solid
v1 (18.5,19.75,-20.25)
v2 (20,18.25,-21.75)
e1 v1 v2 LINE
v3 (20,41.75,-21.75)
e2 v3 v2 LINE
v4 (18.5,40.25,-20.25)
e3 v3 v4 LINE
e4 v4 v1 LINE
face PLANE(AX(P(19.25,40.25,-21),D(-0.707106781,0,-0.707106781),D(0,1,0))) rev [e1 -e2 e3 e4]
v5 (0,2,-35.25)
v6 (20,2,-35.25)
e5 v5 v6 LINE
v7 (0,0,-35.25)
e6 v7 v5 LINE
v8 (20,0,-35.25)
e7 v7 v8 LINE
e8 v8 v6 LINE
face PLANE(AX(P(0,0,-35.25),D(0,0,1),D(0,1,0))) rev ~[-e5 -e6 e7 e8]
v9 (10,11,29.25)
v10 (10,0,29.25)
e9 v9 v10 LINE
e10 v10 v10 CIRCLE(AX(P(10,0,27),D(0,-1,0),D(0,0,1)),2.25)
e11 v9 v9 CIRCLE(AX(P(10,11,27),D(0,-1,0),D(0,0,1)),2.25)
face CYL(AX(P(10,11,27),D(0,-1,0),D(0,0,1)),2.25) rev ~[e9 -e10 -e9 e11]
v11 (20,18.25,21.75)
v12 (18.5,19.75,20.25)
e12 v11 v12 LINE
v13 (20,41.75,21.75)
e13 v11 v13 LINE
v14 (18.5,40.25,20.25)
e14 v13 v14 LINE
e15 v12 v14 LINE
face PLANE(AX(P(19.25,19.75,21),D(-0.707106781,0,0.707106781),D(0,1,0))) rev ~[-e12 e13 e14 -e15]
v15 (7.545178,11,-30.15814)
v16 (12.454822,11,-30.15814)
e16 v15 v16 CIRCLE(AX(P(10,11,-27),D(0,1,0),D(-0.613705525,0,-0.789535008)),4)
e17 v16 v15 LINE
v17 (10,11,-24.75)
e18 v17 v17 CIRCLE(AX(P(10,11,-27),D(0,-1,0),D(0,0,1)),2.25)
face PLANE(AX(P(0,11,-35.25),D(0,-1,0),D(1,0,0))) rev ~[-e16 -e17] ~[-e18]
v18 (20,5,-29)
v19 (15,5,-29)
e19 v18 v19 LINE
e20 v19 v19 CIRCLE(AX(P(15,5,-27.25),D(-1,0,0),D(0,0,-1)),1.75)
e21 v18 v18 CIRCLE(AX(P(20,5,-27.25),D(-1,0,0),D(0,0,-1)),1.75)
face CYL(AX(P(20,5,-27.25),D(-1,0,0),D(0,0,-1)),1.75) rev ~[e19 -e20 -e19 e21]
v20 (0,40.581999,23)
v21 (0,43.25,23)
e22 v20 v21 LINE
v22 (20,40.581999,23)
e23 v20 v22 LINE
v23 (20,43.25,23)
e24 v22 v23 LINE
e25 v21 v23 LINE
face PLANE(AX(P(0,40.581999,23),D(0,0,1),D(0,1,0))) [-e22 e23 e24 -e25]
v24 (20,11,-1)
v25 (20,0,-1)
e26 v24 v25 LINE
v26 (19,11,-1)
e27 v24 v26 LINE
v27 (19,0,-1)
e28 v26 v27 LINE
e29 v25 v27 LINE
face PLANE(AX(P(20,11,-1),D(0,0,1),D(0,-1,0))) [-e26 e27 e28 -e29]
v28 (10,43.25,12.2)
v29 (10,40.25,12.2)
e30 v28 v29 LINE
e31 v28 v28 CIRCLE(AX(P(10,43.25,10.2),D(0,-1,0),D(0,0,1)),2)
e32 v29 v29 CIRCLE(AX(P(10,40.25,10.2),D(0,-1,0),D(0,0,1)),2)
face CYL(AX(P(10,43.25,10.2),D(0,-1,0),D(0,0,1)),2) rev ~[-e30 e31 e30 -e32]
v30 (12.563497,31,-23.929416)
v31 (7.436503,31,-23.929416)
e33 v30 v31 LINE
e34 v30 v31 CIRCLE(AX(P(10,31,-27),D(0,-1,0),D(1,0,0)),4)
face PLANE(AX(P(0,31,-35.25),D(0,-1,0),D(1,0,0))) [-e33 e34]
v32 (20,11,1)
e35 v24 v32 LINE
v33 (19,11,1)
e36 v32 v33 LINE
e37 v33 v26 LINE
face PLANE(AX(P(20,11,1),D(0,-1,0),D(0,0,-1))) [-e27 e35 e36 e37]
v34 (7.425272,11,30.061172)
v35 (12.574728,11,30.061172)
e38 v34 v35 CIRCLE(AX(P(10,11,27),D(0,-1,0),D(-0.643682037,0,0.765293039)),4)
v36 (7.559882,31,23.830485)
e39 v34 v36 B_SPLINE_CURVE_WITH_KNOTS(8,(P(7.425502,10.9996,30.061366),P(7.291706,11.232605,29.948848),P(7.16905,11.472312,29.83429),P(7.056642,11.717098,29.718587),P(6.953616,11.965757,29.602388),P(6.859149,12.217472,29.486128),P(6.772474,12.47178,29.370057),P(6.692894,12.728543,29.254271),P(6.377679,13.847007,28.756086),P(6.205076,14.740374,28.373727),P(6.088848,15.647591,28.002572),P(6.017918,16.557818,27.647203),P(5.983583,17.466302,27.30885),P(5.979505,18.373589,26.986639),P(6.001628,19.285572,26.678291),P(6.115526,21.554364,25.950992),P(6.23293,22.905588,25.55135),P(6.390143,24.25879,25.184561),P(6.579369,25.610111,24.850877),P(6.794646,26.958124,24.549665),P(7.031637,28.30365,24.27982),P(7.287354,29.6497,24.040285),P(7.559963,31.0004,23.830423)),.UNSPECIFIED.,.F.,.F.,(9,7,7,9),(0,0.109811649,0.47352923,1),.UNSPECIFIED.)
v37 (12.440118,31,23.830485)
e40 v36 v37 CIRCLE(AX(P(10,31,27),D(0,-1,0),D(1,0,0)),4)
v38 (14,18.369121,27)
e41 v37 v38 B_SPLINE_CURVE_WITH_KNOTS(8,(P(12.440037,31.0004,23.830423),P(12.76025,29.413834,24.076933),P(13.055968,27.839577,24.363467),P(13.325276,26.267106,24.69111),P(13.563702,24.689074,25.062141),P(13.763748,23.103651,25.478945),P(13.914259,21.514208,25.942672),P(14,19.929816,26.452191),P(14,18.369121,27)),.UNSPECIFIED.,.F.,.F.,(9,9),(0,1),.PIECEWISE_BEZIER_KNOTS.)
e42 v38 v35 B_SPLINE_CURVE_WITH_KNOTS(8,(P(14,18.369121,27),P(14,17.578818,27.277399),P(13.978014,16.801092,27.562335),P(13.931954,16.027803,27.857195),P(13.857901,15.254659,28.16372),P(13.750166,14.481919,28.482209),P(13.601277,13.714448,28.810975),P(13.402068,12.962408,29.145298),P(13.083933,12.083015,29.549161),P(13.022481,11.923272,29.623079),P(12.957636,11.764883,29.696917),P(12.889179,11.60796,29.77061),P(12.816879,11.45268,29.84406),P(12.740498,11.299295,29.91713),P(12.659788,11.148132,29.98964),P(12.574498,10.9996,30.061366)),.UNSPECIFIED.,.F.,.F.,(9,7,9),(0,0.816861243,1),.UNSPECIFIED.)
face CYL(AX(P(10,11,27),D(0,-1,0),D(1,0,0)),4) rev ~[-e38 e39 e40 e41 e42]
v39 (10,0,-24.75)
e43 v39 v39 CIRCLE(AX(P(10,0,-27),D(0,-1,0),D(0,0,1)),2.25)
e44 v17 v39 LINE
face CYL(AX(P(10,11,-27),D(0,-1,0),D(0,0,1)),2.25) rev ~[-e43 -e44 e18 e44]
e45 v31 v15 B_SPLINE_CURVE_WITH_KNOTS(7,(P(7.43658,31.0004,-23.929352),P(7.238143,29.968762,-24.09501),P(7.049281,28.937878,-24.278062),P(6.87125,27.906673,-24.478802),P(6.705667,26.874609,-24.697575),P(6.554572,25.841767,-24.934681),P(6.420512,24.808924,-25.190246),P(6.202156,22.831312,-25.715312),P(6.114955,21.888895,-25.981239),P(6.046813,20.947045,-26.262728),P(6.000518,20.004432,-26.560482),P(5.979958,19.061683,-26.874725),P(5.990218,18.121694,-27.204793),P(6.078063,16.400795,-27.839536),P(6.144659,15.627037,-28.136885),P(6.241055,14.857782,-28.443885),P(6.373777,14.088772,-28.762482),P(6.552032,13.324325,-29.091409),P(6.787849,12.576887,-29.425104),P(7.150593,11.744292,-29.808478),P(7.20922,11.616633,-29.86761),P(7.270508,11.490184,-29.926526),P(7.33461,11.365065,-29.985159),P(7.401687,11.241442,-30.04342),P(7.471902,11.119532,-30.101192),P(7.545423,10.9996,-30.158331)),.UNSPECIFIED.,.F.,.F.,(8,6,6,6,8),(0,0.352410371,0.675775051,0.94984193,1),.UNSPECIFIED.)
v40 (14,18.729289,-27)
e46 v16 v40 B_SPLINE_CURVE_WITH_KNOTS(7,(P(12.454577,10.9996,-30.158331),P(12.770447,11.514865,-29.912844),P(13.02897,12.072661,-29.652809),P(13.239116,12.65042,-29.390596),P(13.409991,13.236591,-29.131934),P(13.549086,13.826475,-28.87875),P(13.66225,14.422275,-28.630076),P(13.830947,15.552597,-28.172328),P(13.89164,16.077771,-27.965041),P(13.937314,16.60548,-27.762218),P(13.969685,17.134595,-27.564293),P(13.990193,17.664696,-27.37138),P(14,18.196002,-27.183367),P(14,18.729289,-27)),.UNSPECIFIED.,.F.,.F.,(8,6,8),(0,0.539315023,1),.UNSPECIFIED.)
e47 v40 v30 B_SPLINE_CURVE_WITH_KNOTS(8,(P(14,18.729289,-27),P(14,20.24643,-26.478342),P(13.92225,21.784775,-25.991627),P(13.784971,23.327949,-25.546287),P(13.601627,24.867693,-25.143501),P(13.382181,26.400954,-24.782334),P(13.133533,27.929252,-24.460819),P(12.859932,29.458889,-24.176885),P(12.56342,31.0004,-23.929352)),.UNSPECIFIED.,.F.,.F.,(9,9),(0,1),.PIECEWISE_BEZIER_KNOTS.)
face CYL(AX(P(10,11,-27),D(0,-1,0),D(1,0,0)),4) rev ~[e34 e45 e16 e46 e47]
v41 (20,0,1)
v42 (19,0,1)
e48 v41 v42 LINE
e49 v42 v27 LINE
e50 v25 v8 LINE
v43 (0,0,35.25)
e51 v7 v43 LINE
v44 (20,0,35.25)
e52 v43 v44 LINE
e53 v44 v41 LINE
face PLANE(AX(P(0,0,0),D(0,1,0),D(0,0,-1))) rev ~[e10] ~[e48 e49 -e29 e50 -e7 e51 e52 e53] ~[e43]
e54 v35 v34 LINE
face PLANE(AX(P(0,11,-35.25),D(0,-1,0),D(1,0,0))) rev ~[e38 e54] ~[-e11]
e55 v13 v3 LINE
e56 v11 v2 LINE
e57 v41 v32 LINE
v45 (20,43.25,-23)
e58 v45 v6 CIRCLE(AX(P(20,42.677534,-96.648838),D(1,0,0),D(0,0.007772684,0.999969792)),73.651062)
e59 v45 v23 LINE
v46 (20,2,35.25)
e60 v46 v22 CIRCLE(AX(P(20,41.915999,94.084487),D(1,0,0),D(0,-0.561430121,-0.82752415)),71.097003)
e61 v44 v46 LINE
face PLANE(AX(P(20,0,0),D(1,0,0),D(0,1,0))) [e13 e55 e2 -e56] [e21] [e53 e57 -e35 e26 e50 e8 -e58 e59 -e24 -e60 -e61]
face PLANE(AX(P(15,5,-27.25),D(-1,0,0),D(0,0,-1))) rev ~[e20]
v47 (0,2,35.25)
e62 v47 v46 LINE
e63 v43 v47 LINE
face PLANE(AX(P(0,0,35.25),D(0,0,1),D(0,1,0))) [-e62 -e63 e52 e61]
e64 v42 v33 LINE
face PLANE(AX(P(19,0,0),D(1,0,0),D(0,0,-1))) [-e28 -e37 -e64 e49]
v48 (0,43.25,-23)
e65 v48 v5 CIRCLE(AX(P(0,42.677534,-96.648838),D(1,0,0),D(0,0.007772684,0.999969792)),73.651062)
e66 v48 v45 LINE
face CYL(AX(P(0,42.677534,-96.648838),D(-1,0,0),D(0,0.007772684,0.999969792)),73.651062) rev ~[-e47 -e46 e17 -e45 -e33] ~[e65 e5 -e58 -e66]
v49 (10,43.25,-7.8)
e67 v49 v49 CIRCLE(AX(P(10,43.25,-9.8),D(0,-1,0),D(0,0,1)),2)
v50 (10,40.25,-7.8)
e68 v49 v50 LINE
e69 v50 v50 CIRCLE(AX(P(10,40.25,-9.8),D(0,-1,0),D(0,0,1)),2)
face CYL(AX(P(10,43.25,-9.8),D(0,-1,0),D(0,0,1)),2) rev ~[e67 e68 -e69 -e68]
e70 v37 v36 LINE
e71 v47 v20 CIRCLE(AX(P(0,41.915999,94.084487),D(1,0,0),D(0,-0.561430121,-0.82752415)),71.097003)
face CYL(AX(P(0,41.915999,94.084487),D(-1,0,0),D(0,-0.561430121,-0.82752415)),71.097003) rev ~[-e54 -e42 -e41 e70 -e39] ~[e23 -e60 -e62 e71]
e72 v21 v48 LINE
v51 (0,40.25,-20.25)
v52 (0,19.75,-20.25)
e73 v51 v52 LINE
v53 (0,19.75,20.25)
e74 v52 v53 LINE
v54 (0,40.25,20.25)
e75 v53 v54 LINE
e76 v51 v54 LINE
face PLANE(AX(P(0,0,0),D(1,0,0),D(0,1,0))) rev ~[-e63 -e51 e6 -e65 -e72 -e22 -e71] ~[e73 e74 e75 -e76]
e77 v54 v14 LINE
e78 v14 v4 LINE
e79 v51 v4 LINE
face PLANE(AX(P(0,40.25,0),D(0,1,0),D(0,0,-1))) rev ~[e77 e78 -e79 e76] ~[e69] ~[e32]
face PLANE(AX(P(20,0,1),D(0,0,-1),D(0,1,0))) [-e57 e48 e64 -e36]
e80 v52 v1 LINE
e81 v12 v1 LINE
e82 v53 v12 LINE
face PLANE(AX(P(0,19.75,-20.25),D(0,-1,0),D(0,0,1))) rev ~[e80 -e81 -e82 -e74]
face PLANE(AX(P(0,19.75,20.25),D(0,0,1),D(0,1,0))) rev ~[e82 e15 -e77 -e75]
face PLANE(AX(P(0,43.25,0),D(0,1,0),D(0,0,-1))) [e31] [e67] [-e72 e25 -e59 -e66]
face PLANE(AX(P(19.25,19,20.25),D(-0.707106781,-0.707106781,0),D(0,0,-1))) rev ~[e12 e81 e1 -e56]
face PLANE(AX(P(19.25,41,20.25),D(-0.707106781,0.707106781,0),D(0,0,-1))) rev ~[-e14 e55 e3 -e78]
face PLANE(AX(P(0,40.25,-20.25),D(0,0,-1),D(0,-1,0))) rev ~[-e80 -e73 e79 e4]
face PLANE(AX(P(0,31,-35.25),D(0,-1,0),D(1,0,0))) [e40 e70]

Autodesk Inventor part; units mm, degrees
ref_plane "YZ Plane" through (0, 0, 0) normal (1, 0, 0) x (0, 1, 0)
ref_plane "XZ Plane" through (0, 0, 0) normal (0, 1, 0) x (-1, 0, 0)
ref_plane "XY Plane" through (0, 0, 0) normal (0, 0, 1) x (1, 0, 0)
sketch "Sketch1" plane through (0, 0, 0) normal (1, 0, 0) x (0, 1, 0)
  line L0 (0, 0) -> (0, -35.25)
  line L1 (0, -35.25) -> (2, -35.25)
  line L2 (19.75, 20.25) -> (40.25, 20.25)
  line L3 (40.25, 20.25) -> (40.25, -20.25)
  line L4 (40.25, -20.25) -> (19.75, -20.25)
  line L5 (19.75, -20.25) -> (19.75, 20.25)
  line L6 (19.75, 20.25) -> (40.25, -20.25) construction
  line L7 (40.25, 20.25) -> (19.75, -20.25) construction
  line L8 (16.75, 23) -> (43.25, 23)
  line L9 (43.25, 23) -> (43.25, -23)
  line L10 (43.25, -23) -> (16.75, -23)
  line L11 (16.75, -23) -> (16.75, 23)
  line L12 (16.75, 23) -> (43.25, -23) construction
  line L13 (43.25, 23) -> (16.75, -23) construction
  line L14 (0, 0) -> (0, 35.25)
  line L15 (0, 35.25) -> (2, 35.25)
  arc A0 (2, 35.25) -> (43.25, 23) centre (41.9161, 94.0847) ccw
  arc A1 (43.25, -23) -> (2, -35.25) centre (42.6775, -96.6486) ccw
  line L16 (-8.65, 0) -> (51.9, 0) projected
  point P0 (20, 0)
  point P1 (40.1, 0)
  point P2 (30, 0)
  point P3 (30, 23)
  point P4 (30.2, -23)
  point P5 (30, 0)
  dimension "d0" = 35.25
  dimension "d1" = 2
  dimension "d2" = 20
  dimension "d4" = 20.5
  dimension "d5" = 40.5
  dimension "d6" = 46
  dimension "d7" = 26.5
  dimension "d8" = 35.25
extrude "Extrusion1" add sketch "Sketch1" along normal blind 20 contours L10 L11 L16 L5 L4 L3 L9 | L16 L11 L10 A1 L1 L0 | L14 L15 A0 L8 L11 L16 | L11 L8 A0 L9 L16 L3 L2 L5 | L8 A0
sketch "Sketch2" plane through (0, 43.25, 23) normal (0, 1, 0) x (1, 0, 0)
  line L0 (0, 46) -> (0, 0) projected
  line L1 (0, 0) -> (20, 0) projected
  line L2 (20, 46) -> (20, 0) projected
  line L3 (0, 46) -> (20, 46) projected
  line L4 (0, 2.75) -> (20, 2.75) projected
  line L5 (0, 2.75) -> (20, 2.75) projected
  point P0 (0, 23)
  point P1 (10, 12.8)
  point P2 (10, 32.8)
  dimension "d33" = 20
  dimension "d34" = 10.05
hole "Hole1" at (10, 43.25, 10.2) at (10, 43.25, -9.8) direction (0, -1, 0) diameter 4 end up to surface
ref_plane "Work Plane1" through (0, 11, -35.25) normal (0, -1, 0) x (1, 0, 0)
sketch "Sketch3" plane through (0, 11, -35.25) normal (0, -1, 0) x (1, 0, 0)
  circle A0 centre (10, 45.45) radius 2 projected
  line L0 (0, 12.25) -> (0, 58.25) projected
  line L1 (0, 58.25) -> (20, 58.25) projected
  line L2 (20, 12.25) -> (20, 58.25) projected
  line L3 (0, 12.25) -> (20, 12.25) projected
  line L4 (0, 55.5) -> (0, 15) projected
  line L5 (0, 55.5) -> (20, 55.5) projected
  line L6 (20, 15) -> (20, 55.5) projected
  line L7 (0, 15) -> (20, 15) projected
  circle A1 centre (10, 62.25) radius 4
  circle A2 centre (10, 8.25) radius 4
  point P0 (0, 35.25)
  dimension "d19" = 4
  dimension "d20" = 4
  dimension "d30" = 8
  dimension "d31" = 8
extrude "Extrusion2" cut sketch "Sketch3" against normal blind 20 contours A1 | A2
hole "Hole2" at (10, 11, 27) at (10, 11, -27) direction (0, -1, 0) diameter 4.5 end through all
chamfer "Chamfer1" distance 1.5 angle 45 4 edges at (20, 40.25, 0) (20, 30, 20.25) (20, 19.75, 0) (20, 30, -20.25)
sketch "Sketch4" plane through (20, 0, 0) normal (1, 0, 0) x (0, 0, -1)
  line L0 (0, -8.65) -> (0, 51.9) projected
  line L1 (-35.25, 0) -> (35.25, 0) projected
  line L2 (0, 0) -> (-1, 0)
  line L3 (-1, 0) -> (-1, 11)
  line L4 (-1, 11) -> (0, 11)
  line L5 (0, 11) -> (0, 0)
  line L6 (0, 11) -> (1, 11)
  line L7 (1, 11) -> (1, 0)
  line L8 (1, 0) -> (0, 0)
  line L9 (0, 0) -> (0, 11)
  dimension "d51" = 1
  dimension "d52" = 1
extrude "Extrusion3" cut sketch "Sketch4" against normal blind 1
sketch "Sketch5" plane through (20, 0, 0) normal (1, 0, 0) x (0, 0, -1)
  line L0 (0, 0) -> (35.25, 0) projected
  line L1 (35.25, 0) -> (35.25, 2) projected
  point P0 (27.25, 5)
  dimension "d42" = 5
  dimension "d43" = 8
hole "Hole3" at (20, 5, -27.25) direction (-1, 0, 0) diameter 3.5 depth 5
equation "\"d8\" = d0"
equation "\"d20\" = d19"
equation "\"d31\" = d30"
equation "\"d52\" = d51"
properties part number "espaceur_20mm_v4"
